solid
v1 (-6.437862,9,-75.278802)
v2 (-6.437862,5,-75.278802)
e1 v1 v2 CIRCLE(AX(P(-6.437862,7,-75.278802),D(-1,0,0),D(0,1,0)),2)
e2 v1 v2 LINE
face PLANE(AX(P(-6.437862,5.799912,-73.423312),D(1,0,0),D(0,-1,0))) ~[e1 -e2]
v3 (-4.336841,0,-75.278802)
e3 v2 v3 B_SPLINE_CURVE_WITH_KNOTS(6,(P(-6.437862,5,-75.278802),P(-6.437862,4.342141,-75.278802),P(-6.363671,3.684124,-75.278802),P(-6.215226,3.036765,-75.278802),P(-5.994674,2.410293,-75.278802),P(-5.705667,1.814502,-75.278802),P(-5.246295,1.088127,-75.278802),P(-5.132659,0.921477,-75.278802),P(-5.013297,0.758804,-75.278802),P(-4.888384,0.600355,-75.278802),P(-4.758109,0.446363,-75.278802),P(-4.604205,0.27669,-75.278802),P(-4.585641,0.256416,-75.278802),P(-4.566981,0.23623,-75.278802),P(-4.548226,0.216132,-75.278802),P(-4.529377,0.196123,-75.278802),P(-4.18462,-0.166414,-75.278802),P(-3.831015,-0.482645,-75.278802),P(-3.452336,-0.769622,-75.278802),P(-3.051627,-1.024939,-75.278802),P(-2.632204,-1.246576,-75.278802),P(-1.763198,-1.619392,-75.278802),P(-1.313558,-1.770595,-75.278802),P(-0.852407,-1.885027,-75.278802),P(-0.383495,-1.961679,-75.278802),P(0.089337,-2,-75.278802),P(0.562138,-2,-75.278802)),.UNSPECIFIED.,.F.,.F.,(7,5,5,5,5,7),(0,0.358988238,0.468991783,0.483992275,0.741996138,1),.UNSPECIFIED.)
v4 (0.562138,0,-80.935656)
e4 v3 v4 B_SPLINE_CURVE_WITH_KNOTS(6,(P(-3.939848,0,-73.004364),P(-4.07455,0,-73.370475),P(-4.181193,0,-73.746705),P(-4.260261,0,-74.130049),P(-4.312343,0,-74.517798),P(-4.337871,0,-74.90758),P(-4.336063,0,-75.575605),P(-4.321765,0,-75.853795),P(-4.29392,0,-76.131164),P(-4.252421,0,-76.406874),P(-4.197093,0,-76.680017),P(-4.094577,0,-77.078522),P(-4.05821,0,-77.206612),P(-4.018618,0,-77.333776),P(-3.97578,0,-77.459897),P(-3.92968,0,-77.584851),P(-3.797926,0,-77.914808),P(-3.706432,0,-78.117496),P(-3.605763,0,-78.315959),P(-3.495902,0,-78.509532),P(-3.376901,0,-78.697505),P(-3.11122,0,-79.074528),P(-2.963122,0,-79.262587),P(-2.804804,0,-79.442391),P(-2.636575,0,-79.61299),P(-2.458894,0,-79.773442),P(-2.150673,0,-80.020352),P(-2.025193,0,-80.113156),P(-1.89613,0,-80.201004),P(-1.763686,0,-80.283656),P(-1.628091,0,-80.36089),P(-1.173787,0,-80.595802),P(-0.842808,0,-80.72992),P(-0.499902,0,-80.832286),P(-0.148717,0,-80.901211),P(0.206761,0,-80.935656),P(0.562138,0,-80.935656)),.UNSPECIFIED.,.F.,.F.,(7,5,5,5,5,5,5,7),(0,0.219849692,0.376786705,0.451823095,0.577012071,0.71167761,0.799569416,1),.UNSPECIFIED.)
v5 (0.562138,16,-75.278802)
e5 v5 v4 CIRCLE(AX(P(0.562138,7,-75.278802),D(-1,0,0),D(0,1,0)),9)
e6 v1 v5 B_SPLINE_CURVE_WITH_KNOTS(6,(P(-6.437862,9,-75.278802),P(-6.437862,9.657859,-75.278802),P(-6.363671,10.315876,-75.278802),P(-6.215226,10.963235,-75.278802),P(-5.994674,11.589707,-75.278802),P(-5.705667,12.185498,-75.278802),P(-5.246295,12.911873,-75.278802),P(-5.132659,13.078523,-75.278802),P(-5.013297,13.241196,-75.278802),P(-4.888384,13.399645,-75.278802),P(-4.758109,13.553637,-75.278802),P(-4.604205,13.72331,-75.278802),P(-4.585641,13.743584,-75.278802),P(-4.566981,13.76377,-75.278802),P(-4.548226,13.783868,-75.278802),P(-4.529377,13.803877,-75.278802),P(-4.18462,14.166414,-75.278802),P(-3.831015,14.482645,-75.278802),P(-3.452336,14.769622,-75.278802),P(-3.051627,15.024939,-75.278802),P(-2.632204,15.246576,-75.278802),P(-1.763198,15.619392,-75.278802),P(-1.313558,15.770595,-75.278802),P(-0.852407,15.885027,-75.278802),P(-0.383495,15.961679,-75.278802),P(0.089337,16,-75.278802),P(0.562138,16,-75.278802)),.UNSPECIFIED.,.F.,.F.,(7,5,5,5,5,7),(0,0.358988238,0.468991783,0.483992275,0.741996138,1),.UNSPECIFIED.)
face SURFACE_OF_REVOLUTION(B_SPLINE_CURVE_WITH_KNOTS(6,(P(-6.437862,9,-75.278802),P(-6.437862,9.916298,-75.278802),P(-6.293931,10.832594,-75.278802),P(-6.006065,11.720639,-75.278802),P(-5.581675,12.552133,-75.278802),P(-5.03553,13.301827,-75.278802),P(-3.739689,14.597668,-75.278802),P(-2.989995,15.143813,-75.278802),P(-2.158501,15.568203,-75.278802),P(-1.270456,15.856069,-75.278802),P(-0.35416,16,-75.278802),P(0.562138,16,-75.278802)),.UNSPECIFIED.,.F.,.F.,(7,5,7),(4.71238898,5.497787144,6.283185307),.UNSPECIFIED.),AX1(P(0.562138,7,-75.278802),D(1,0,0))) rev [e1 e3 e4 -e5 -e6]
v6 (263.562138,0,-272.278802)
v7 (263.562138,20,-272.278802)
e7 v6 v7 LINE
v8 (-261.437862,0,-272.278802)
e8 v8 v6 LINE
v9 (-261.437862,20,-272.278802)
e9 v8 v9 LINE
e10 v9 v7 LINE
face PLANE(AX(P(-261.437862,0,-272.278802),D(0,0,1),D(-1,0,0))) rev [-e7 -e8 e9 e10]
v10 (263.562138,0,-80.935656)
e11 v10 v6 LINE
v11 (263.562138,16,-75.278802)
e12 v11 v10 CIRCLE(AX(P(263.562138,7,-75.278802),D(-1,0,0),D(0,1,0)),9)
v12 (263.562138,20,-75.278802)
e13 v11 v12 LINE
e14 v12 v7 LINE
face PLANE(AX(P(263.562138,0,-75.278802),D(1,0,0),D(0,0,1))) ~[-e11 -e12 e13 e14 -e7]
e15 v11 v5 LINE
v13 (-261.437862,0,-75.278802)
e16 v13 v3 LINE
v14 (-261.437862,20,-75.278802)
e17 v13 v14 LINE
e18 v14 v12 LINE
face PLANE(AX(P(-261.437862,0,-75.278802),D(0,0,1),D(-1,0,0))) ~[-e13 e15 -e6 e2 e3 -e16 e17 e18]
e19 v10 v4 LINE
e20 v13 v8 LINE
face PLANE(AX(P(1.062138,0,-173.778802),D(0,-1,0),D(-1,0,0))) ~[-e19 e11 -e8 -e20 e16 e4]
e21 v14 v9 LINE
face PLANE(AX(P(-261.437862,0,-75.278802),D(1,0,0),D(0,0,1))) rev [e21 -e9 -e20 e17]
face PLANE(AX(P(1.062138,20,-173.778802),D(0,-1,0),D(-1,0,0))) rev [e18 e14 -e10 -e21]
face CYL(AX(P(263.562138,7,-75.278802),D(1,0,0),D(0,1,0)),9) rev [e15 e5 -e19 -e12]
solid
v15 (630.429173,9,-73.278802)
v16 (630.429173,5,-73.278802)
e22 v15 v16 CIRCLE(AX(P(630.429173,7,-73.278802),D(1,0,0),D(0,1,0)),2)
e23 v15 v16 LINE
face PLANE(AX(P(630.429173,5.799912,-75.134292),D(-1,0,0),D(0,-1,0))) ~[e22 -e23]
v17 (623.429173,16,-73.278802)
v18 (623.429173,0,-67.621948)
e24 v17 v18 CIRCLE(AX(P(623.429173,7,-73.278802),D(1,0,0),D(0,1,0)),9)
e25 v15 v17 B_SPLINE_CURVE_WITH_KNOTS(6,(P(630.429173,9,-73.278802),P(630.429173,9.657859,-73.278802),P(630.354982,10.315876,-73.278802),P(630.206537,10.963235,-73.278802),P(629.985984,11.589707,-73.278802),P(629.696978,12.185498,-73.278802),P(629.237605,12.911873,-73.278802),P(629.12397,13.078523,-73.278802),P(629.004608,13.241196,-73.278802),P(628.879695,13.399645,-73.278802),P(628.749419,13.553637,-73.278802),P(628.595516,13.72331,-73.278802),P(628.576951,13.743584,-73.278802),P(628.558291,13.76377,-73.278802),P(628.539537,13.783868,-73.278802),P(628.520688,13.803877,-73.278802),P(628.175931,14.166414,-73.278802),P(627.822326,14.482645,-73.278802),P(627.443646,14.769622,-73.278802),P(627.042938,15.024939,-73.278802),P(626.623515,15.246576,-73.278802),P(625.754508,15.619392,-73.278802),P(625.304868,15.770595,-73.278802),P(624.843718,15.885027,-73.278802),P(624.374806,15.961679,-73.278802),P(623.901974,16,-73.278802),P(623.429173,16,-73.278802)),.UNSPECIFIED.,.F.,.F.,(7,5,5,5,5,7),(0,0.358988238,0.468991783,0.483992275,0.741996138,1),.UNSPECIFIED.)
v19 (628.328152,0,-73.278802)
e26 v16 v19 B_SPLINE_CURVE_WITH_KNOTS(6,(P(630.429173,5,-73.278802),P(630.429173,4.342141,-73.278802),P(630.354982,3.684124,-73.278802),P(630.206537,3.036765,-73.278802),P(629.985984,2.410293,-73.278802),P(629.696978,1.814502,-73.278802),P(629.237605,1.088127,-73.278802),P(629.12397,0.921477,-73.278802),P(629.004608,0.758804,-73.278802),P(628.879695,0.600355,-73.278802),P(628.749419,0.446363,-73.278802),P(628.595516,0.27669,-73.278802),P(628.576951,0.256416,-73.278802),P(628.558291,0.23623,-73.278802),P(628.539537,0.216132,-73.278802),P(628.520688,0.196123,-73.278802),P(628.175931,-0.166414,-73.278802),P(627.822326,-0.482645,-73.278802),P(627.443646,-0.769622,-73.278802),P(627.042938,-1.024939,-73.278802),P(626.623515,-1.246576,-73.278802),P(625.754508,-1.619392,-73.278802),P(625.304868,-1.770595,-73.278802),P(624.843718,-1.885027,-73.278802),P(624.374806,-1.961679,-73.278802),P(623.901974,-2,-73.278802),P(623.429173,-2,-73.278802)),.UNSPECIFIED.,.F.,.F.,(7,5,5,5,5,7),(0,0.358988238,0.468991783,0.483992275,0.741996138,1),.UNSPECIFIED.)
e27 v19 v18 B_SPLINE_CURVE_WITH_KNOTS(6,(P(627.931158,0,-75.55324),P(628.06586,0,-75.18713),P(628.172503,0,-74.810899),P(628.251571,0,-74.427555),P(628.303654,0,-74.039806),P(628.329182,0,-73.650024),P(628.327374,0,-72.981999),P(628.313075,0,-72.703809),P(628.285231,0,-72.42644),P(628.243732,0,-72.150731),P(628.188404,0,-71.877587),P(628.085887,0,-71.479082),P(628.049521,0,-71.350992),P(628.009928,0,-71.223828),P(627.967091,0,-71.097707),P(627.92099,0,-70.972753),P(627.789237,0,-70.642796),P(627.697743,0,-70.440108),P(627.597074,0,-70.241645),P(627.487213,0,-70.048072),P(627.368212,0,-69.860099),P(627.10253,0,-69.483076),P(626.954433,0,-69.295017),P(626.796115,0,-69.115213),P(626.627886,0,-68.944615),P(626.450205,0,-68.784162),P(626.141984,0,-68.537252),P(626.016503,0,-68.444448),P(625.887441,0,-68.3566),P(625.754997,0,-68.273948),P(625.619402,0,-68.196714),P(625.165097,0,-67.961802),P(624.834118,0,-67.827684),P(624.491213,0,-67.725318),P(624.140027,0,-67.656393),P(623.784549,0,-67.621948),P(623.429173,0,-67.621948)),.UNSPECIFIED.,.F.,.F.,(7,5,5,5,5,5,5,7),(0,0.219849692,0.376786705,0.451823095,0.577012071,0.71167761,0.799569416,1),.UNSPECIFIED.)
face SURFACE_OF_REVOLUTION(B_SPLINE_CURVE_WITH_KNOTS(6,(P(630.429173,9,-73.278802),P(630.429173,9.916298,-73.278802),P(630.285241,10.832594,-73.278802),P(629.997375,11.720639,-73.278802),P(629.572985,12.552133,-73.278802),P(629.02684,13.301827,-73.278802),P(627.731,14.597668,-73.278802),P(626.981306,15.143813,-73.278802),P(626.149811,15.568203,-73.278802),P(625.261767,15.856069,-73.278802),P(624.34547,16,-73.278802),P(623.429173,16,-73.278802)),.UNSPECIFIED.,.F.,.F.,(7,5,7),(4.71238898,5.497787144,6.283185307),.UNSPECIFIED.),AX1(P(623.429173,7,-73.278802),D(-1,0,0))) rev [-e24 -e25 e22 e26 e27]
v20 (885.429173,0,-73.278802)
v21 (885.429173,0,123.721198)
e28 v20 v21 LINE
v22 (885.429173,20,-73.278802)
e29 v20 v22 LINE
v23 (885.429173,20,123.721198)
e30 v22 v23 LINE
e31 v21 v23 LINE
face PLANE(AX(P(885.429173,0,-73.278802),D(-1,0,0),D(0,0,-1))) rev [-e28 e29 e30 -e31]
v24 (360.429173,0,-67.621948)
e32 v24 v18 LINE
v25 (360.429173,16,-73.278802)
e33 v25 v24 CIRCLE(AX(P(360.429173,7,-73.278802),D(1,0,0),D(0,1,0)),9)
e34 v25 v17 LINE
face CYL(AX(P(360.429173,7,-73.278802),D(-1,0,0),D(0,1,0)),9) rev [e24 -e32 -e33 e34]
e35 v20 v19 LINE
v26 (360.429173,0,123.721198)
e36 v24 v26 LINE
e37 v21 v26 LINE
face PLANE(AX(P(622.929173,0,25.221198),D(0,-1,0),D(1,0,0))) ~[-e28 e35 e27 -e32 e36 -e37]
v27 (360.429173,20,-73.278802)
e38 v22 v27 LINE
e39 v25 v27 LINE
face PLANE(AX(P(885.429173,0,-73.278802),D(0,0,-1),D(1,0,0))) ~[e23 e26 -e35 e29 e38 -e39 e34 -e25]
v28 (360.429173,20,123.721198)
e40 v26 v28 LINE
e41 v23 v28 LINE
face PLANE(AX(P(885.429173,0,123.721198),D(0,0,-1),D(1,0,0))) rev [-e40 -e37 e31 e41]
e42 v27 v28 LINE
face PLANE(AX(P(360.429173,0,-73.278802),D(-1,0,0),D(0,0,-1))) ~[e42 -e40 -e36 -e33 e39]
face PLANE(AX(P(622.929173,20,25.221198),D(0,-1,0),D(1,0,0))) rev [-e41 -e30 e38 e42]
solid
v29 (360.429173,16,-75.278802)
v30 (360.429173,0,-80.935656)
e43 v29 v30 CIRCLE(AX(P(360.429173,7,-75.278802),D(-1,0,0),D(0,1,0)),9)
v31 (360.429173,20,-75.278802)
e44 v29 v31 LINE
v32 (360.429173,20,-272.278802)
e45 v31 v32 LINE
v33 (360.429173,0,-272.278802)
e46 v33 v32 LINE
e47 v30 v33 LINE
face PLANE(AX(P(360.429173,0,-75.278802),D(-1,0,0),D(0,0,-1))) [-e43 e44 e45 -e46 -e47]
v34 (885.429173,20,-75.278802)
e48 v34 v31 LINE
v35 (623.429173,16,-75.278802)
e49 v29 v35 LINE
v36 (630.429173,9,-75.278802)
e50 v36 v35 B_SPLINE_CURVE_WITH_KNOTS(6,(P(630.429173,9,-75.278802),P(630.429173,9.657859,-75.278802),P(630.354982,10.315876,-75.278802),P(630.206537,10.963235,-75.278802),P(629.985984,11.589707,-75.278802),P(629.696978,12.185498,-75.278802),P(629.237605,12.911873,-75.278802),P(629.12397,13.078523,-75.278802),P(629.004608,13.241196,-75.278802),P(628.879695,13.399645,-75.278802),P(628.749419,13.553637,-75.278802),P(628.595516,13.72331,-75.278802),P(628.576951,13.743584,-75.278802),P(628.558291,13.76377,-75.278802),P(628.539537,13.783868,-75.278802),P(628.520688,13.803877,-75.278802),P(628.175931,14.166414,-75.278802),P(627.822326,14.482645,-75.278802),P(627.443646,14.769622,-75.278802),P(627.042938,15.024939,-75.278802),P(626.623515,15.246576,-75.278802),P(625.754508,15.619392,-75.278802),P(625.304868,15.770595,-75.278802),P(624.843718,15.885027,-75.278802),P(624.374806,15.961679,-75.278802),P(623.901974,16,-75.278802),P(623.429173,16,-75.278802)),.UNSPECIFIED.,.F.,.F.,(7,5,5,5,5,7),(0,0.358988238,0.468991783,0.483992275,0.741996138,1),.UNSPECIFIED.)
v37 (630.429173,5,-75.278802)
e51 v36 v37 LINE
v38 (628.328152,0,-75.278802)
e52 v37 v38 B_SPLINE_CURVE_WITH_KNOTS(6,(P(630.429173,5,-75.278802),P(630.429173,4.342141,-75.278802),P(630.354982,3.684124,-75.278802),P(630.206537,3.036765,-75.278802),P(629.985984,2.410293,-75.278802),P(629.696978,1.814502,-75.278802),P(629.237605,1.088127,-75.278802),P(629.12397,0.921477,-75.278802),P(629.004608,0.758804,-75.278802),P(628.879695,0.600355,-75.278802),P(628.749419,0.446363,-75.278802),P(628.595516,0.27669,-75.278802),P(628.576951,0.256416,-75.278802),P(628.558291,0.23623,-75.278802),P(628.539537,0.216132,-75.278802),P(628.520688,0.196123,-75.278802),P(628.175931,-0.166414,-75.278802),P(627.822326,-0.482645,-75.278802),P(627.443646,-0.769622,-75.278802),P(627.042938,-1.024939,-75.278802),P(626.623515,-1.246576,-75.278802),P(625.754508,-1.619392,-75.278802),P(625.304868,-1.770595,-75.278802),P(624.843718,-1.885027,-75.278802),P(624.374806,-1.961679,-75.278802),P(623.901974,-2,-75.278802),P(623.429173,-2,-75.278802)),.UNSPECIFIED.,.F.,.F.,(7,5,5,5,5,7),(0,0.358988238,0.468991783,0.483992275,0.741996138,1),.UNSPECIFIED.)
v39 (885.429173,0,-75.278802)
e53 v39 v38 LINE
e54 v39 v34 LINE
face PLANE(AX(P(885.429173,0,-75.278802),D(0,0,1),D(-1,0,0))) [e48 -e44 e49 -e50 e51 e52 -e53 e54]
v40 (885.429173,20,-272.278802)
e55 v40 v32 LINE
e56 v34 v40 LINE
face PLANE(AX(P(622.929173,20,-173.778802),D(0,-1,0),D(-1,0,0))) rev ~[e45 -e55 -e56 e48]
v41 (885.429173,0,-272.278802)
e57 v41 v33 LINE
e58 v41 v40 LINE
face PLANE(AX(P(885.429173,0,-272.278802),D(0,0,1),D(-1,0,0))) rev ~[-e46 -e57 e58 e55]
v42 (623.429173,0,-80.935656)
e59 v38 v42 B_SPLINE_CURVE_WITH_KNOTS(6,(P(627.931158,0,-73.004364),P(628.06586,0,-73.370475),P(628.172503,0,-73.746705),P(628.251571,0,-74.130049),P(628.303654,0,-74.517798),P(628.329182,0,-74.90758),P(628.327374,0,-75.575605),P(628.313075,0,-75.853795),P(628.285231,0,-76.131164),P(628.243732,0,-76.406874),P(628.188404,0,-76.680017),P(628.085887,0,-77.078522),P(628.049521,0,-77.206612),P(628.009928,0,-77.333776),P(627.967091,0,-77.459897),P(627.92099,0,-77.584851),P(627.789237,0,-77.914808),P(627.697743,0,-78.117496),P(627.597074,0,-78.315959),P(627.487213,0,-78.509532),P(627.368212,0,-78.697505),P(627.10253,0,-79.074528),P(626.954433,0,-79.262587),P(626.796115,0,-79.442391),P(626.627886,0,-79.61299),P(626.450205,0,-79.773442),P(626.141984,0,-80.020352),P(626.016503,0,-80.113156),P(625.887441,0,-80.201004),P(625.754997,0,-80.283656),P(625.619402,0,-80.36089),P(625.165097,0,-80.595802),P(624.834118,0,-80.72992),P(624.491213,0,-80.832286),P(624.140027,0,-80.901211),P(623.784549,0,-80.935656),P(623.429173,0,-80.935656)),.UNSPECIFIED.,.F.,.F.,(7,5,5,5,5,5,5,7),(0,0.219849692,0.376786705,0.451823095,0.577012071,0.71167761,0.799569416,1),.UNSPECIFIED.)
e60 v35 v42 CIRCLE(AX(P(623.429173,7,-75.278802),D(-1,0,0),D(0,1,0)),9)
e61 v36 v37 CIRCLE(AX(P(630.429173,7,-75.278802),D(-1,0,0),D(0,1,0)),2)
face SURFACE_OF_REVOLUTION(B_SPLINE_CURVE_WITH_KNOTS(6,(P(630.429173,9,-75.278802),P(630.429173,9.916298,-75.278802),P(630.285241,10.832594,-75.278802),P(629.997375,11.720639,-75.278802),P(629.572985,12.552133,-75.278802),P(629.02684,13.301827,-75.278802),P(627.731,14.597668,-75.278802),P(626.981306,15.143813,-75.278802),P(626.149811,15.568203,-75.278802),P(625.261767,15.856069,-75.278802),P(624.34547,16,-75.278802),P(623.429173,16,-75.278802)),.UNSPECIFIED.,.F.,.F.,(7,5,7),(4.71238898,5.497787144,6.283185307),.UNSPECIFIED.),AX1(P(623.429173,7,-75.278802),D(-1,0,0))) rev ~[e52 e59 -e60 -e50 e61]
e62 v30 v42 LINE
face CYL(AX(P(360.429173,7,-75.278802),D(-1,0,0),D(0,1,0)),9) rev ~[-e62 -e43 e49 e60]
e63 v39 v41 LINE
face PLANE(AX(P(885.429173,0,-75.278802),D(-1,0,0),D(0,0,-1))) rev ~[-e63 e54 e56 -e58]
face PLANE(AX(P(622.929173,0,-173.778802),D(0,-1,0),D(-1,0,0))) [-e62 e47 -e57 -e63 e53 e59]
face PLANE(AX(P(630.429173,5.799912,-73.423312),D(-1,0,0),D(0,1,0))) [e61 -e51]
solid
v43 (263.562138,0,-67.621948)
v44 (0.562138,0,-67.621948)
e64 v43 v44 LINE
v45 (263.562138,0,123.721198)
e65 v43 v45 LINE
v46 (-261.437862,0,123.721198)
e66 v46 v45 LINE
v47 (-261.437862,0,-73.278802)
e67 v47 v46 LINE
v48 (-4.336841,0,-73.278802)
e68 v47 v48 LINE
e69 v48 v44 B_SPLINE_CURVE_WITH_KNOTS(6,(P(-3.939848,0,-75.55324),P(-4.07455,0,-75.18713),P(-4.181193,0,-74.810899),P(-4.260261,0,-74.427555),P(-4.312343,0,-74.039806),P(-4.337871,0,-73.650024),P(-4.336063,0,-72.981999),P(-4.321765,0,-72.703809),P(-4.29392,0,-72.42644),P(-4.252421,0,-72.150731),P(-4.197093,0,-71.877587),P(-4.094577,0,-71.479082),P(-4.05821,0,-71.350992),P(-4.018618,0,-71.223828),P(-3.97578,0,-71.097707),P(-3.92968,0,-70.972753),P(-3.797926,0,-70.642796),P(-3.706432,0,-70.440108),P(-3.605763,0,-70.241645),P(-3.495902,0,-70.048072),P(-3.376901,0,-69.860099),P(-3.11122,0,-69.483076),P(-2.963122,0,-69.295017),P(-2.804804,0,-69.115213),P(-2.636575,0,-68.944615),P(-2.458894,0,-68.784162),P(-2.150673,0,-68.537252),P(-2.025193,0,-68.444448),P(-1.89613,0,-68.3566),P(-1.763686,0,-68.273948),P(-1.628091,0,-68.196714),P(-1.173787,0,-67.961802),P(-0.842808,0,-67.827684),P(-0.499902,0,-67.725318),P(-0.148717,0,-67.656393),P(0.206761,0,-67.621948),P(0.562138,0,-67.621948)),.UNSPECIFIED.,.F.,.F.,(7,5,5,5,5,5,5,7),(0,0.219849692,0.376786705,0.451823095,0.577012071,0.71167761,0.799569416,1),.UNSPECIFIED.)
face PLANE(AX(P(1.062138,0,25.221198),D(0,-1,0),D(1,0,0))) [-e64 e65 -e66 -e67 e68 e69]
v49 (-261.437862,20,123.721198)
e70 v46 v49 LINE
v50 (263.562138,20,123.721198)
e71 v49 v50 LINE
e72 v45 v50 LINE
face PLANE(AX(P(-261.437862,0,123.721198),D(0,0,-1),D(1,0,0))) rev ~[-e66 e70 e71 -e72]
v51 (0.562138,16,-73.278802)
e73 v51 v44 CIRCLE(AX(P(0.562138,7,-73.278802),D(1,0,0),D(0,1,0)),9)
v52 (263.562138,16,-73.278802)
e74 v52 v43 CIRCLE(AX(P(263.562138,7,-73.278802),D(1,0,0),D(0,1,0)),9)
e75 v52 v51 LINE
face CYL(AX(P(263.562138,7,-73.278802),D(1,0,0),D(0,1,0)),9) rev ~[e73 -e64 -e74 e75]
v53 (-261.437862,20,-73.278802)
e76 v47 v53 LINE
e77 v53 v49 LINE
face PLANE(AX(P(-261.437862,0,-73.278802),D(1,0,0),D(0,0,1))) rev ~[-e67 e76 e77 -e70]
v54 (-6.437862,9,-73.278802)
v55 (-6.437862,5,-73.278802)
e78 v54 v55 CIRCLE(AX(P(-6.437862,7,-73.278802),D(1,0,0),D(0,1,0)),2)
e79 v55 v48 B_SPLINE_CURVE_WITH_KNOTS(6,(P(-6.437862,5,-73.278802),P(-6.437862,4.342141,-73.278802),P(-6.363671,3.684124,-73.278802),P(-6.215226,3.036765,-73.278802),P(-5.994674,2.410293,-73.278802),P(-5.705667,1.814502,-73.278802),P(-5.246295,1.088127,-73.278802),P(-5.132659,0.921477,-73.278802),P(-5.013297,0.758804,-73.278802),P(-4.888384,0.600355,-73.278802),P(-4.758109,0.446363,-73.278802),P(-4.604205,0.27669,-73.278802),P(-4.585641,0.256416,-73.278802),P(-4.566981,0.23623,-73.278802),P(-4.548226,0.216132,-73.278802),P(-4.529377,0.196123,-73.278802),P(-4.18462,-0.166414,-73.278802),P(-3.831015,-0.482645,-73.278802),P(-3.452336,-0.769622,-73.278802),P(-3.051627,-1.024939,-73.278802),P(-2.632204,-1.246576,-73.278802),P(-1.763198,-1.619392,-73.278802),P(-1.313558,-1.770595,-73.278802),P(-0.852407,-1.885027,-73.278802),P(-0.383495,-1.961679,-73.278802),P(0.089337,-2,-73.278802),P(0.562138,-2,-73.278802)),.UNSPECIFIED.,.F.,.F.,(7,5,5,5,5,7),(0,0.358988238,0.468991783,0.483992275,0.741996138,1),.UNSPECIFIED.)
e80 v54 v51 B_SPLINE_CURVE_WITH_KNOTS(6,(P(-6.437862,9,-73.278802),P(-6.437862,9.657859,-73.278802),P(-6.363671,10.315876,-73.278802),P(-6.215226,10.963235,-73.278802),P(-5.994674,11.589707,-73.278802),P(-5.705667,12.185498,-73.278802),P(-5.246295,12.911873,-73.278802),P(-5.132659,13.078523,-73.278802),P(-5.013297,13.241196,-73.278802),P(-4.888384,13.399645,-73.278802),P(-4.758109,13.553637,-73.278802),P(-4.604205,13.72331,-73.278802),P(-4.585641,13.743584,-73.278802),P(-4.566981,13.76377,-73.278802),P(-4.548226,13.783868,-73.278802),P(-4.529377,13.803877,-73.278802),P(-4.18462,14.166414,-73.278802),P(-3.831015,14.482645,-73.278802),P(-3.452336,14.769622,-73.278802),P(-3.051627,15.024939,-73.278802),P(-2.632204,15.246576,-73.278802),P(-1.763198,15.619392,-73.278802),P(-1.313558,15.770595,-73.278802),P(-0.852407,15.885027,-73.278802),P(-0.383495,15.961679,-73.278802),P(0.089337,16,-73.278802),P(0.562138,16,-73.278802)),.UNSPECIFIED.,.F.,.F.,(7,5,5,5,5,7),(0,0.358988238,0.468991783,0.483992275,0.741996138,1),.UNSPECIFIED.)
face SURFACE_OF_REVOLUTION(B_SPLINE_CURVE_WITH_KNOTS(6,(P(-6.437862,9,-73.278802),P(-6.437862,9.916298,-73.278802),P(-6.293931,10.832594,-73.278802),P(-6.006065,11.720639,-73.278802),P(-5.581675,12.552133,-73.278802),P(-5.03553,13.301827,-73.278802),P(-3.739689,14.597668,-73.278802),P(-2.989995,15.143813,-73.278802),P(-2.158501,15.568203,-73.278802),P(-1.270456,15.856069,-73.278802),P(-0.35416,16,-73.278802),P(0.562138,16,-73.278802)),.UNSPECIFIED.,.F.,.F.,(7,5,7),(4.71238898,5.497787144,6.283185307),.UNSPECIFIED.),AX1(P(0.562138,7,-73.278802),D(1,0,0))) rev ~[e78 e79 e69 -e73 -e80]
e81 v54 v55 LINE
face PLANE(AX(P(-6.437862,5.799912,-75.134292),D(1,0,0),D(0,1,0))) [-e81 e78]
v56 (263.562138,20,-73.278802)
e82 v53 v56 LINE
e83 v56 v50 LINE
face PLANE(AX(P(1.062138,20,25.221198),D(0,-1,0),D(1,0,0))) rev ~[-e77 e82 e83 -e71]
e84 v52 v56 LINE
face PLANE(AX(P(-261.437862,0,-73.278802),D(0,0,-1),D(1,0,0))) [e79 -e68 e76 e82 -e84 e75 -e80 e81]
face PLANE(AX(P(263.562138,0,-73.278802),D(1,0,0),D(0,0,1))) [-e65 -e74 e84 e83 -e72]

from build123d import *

# Parameters (mm, degrees)
F0_W     = 525
F0_H     = 197
F1_DEPTH = 20
F3_DEPTH = 270
F4_R     = 7


with BuildPart() as f1:
    # F0 (on Front) → F1 (new body)
    with BuildSketch(Plane.XZ):
        with Locations((1.0621380061, 25.221197979)):
            Rectangle(F0_W, F0_H)
    extrude(amount=-F1_DEPTH)

    # F2 (on face) → F3 (cut)
    with BuildSketch(Plane.YZ.offset(263.5621380061)):
        with BuildLine():
            ThreePointArc((0, -67.6219477715), (4, -81.7640833952), (16, -73.278802021))
            Line((16, -73.278802021), (0, -73.278802021))
            Line((0, -73.278802021), (0, -67.6219477715))
        make_face()
        with BuildLine():
            Line((0, -73.278802021), (16, -73.278802021))
            ThreePointArc((16, -73.278802021), (10, -64.7935206468), (0, -67.6219477715))
            Line((0, -67.6219477715), (0, -73.278802021))
        make_face()
    extrude(amount=-F3_DEPTH, mode=Mode.SUBTRACT)

    # F4
    f4_edges = [f1.edges().sort_by_distance(p)[0] for p in [
        (-6.437862, 10, -64.793521),
    ]]
    fillet(f4_edges, radius=F4_R)


with BuildPart() as f7_1:
    # F7: instance of F1
    add(f1.part.mirror(Plane(origin=(-53.484370932, 25, -74.278802021), x_dir=(1, 0, 0), z_dir=(0, 0, 1))))


with BuildPart() as f10_1:
    # F10: instance of F1
    add(f1.part.mirror(Plane(origin=(311.9956552982, 12.5, -58.2793839276), x_dir=(0, 0, -1), z_dir=(1, 0, 0))))


with BuildPart() as f10_2:
    # F10: instance of F7_1
    add(f7_1.part.mirror(Plane(origin=(311.9956552982, 12.5, -58.2793839276), x_dir=(0, 0, -1), z_dir=(1, 0, 0))))


solid = Compound([f1.part, f7_1.part, f10_1.part, f10_2.part])
